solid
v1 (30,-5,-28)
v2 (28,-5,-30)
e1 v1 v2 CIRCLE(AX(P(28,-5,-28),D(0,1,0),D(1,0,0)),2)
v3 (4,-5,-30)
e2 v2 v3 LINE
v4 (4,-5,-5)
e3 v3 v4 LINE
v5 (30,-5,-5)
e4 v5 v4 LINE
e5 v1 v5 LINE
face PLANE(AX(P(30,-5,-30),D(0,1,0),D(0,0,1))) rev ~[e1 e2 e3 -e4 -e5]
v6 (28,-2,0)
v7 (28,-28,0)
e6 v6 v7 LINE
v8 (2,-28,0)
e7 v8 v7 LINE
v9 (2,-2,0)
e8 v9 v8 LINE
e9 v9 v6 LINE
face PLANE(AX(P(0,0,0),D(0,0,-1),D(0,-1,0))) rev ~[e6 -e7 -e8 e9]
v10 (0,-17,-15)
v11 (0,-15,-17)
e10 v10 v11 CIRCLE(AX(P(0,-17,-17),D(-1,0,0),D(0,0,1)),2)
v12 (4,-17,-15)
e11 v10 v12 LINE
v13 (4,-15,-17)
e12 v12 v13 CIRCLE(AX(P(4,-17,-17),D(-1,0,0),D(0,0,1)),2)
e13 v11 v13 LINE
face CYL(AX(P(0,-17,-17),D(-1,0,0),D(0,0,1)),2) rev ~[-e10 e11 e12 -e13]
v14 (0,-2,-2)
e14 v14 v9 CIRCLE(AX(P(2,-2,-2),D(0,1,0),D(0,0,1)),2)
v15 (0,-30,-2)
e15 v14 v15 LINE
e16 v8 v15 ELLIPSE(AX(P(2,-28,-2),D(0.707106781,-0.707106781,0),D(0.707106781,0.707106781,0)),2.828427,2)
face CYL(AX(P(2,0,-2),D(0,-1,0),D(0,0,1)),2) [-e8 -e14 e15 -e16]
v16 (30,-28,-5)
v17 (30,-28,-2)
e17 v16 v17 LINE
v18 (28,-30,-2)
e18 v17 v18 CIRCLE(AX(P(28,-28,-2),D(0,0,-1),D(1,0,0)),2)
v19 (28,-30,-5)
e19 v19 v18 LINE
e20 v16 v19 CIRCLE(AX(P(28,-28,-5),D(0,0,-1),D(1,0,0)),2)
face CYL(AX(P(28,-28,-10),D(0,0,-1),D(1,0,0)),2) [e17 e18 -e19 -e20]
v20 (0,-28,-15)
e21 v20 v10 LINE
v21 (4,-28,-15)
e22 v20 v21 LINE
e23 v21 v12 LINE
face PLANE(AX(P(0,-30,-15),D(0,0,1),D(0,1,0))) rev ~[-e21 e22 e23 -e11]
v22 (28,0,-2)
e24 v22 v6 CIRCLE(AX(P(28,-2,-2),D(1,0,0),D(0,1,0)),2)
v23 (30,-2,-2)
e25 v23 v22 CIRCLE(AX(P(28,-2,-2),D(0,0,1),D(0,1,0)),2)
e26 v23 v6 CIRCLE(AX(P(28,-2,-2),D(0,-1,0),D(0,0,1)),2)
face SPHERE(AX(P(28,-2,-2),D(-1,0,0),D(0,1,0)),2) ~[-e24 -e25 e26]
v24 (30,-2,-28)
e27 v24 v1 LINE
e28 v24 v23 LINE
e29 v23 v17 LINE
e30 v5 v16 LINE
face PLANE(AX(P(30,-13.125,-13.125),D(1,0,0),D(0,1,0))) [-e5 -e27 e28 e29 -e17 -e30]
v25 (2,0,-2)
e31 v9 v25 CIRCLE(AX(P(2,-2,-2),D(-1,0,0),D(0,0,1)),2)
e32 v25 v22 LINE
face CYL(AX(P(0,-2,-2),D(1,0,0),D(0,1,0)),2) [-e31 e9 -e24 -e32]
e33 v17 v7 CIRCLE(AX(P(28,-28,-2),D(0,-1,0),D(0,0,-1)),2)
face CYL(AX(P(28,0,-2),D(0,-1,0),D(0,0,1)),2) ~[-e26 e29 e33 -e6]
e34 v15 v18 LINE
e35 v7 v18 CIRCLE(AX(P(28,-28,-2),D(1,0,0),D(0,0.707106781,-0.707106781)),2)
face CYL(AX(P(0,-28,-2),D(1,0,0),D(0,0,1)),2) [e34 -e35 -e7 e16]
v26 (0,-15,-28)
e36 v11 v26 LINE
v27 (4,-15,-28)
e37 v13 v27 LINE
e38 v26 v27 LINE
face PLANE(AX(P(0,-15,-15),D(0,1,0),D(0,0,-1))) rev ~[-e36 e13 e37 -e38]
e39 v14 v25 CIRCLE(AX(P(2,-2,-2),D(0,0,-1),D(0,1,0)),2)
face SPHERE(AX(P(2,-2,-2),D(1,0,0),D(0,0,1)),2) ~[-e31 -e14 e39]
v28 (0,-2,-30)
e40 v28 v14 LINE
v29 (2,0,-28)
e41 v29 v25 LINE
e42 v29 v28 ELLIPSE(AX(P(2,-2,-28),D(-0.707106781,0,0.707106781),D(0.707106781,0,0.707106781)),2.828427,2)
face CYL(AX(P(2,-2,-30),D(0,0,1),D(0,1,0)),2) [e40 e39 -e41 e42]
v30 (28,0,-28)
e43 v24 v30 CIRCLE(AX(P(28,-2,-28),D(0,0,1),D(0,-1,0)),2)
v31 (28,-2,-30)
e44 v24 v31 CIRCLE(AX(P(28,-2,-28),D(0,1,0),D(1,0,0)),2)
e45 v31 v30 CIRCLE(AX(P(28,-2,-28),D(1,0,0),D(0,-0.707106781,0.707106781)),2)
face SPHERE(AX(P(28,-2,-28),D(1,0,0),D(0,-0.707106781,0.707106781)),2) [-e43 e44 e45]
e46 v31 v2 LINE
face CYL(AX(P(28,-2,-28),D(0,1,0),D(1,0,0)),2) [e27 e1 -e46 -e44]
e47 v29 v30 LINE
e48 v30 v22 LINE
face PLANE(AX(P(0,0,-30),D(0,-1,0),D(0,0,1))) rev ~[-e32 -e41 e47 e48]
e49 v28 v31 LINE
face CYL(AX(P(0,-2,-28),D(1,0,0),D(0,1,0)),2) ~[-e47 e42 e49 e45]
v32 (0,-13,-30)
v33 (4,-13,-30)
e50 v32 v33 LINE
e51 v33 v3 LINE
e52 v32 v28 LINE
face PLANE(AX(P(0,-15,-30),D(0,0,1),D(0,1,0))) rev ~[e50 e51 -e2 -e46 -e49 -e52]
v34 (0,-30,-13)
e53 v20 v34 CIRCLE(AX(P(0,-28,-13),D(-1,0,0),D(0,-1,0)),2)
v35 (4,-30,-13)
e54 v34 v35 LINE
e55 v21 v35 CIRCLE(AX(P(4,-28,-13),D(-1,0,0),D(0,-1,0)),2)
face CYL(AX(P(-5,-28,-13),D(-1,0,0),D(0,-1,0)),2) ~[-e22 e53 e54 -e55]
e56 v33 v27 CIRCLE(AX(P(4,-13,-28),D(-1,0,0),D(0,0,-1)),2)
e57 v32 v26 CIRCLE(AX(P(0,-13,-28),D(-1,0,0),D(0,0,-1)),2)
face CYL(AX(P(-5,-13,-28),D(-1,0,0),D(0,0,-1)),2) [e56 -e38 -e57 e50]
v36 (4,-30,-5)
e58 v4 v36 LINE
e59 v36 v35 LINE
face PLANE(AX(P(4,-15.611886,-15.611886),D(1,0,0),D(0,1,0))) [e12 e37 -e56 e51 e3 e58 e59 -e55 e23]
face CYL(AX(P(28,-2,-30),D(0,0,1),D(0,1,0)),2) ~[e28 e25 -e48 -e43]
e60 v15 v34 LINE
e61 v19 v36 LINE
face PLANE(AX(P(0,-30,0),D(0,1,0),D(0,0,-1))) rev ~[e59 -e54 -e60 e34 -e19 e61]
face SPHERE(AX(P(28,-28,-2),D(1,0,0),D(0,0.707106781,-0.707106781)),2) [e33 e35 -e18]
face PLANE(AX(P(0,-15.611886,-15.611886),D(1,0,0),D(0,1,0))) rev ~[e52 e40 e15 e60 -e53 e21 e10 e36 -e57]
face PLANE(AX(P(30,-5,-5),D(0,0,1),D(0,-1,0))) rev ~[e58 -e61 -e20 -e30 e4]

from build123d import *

# Parameters (mm, degrees)
F1_DEPTH     = 30
F3_DEPTH     = 26
F4_R         = 2
F5_T1_DEPTH  = 4
F5_T3_DEPTH  = 14
F5_T5_DEPTH  = 8
F5_T7_DEPTH  = 8
F5_S11_W     = 2
F5_S11_H     = 2
F5_T12_DEPTH = 2
F5_S17_W     = 2
F5_S17_H     = 2
F5_T18_DEPTH = 2


# Not quite as in the source:
# - a fillet or chamfer that OpenCascade refuses, or shapes differently, is made with other operations: its cross-section is extruded or revolved along the edge and cut away or added


with BuildPart() as f1:
    # F0 (on Right) → F1 (new body)
    with BuildSketch(Plane.YZ):
        Polygon((0, -30), (0, 0), (-30, 0), (-30, -15), (-15, -15), (-15, -30), align=None)
    extrude(amount=F1_DEPTH)

    # F2 (on face) → F3 (cut)
    with BuildSketch(Plane.YZ.offset(30)):
        Polygon((-30, -5), (-30, -15), (-15, -15), (-15, -30), (-5, -30), (-5, -5), align=None)
    extrude(amount=-F3_DEPTH, mode=Mode.SUBTRACT)

    # F4
    f4_edges = [f1.edges().sort_by_distance(p)[0] for p in [
        (15, -30, 0),
        (15, 0, 0),
        (0, -15, 0),
        (0, 0, -15),
        (15, 0, -30),
        (30, 0, -15),
        (30, -15, 0),
    ]]
    fillet(f4_edges, radius=F4_R)

    # F5: fillet of radius 2 on 5 edges, made by hand

    # F5_s2 → F5_t1 (join)
    with BuildSketch(Plane.YZ):
        with BuildLine():
            ThreePointArc((-17, -15), (-15.5857864376, -15.5857864376), (-15, -17))
            Line((-15, -17), (-15, -15))
            Line((-15, -15), (-17, -15))
        make_face()
    extrude(amount=F5_T1_DEPTH)

    # F5_s4 → F5_t3 (cut)
    with BuildSketch(Plane.YZ.offset(-5)):
        with BuildLine():
            ThreePointArc((-13, -30), (-14.4142135624, -29.4142135624), (-15, -28))
            Line((-15, -28), (-15, -30))
            Line((-15, -30), (-13, -30))
        make_face()
        with BuildLine():
            ThreePointArc((-30, -13), (-29.4142135624, -14.4142135624), (-28, -15))
            Line((-28, -15), (-30, -15))
            Line((-30, -15), (-30, -13))
        make_face()
    extrude(amount=F5_T3_DEPTH, mode=Mode.SUBTRACT)

    # F5_s6 → F5_t5 (cut)
    with BuildSketch(Plane.XZ.offset(2)):
        with BuildLine():
            ThreePointArc((30, -28), (29.4142135624, -29.4142135624), (28, -30))
            Line((28, -30), (30, -30))
            Line((30, -30), (30, -28))
        make_face()
    extrude(amount=F5_T5_DEPTH, mode=Mode.SUBTRACT)

    # F5_s8 → F5_t7 (cut)
    with BuildSketch(Plane.XY.offset(-10)):
        with BuildLine():
            ThreePointArc((30, -28), (29.4142135624, -29.4142135624), (28, -30))
            Line((28, -30), (30, -30))
            Line((30, -30), (30, -28))
        make_face()
    extrude(amount=F5_T7_DEPTH, mode=Mode.SUBTRACT)


with BuildPart() as f5_tool10:
    # F5_s11 → F5_t12 (new body)
    with BuildSketch(Plane.YZ.offset(28)):
        with Locations((-29, -1)):
            Rectangle(F5_S11_W, F5_S11_H)
    extrude(amount=F5_T12_DEPTH)

    # F5_s13 → F5_t14 (revolve, cut)
    with BuildSketch(Plane(origin=(28, -28, -2), x_dir=(0, 0.7071067812, -0.7071067812), z_dir=(0, -0.7071067812, -0.7071067812))):
        with BuildLine():
            ThreePointArc((0, -2), (2, 0), (0, 2))
            Line((0, 2), (0, -2))
        make_face()
    revolve(axis=Axis((28, -28, -2), (1, 0, 0)), mode=Mode.SUBTRACT)


with BuildPart() as f1_1:
    add(f1.part)

    # F5_t9: cut F5_tool10
    add(f5_tool10.part, mode=Mode.SUBTRACT)


with BuildPart() as f5_tool16:
    # F5_s17 → F5_t18 (new body)
    with BuildSketch(Plane.YZ.offset(28)):
        with Locations((-1, -29)):
            Rectangle(F5_S17_W, F5_S17_H)
    extrude(amount=F5_T18_DEPTH)

    # F5_s19 → F5_t20 (revolve, cut)
    with BuildSketch(Plane(origin=(28, -2, -28), x_dir=(0, -0.7071067812, 0.7071067812), z_dir=(0, 0.7071067812, 0.7071067812))):
        with BuildLine():
            ThreePointArc((0, -2), (2, 0), (0, 2))
            Line((0, 2), (0, -2))
        make_face()
    revolve(axis=Axis((28, -2, -28), (1, 0, 0)), mode=Mode.SUBTRACT)


with BuildPart() as f1_2:
    add(f1_1.part)

    # F5_t15: cut F5_tool16
    add(f5_tool16.part, mode=Mode.SUBTRACT)


solid = f1_2.part
